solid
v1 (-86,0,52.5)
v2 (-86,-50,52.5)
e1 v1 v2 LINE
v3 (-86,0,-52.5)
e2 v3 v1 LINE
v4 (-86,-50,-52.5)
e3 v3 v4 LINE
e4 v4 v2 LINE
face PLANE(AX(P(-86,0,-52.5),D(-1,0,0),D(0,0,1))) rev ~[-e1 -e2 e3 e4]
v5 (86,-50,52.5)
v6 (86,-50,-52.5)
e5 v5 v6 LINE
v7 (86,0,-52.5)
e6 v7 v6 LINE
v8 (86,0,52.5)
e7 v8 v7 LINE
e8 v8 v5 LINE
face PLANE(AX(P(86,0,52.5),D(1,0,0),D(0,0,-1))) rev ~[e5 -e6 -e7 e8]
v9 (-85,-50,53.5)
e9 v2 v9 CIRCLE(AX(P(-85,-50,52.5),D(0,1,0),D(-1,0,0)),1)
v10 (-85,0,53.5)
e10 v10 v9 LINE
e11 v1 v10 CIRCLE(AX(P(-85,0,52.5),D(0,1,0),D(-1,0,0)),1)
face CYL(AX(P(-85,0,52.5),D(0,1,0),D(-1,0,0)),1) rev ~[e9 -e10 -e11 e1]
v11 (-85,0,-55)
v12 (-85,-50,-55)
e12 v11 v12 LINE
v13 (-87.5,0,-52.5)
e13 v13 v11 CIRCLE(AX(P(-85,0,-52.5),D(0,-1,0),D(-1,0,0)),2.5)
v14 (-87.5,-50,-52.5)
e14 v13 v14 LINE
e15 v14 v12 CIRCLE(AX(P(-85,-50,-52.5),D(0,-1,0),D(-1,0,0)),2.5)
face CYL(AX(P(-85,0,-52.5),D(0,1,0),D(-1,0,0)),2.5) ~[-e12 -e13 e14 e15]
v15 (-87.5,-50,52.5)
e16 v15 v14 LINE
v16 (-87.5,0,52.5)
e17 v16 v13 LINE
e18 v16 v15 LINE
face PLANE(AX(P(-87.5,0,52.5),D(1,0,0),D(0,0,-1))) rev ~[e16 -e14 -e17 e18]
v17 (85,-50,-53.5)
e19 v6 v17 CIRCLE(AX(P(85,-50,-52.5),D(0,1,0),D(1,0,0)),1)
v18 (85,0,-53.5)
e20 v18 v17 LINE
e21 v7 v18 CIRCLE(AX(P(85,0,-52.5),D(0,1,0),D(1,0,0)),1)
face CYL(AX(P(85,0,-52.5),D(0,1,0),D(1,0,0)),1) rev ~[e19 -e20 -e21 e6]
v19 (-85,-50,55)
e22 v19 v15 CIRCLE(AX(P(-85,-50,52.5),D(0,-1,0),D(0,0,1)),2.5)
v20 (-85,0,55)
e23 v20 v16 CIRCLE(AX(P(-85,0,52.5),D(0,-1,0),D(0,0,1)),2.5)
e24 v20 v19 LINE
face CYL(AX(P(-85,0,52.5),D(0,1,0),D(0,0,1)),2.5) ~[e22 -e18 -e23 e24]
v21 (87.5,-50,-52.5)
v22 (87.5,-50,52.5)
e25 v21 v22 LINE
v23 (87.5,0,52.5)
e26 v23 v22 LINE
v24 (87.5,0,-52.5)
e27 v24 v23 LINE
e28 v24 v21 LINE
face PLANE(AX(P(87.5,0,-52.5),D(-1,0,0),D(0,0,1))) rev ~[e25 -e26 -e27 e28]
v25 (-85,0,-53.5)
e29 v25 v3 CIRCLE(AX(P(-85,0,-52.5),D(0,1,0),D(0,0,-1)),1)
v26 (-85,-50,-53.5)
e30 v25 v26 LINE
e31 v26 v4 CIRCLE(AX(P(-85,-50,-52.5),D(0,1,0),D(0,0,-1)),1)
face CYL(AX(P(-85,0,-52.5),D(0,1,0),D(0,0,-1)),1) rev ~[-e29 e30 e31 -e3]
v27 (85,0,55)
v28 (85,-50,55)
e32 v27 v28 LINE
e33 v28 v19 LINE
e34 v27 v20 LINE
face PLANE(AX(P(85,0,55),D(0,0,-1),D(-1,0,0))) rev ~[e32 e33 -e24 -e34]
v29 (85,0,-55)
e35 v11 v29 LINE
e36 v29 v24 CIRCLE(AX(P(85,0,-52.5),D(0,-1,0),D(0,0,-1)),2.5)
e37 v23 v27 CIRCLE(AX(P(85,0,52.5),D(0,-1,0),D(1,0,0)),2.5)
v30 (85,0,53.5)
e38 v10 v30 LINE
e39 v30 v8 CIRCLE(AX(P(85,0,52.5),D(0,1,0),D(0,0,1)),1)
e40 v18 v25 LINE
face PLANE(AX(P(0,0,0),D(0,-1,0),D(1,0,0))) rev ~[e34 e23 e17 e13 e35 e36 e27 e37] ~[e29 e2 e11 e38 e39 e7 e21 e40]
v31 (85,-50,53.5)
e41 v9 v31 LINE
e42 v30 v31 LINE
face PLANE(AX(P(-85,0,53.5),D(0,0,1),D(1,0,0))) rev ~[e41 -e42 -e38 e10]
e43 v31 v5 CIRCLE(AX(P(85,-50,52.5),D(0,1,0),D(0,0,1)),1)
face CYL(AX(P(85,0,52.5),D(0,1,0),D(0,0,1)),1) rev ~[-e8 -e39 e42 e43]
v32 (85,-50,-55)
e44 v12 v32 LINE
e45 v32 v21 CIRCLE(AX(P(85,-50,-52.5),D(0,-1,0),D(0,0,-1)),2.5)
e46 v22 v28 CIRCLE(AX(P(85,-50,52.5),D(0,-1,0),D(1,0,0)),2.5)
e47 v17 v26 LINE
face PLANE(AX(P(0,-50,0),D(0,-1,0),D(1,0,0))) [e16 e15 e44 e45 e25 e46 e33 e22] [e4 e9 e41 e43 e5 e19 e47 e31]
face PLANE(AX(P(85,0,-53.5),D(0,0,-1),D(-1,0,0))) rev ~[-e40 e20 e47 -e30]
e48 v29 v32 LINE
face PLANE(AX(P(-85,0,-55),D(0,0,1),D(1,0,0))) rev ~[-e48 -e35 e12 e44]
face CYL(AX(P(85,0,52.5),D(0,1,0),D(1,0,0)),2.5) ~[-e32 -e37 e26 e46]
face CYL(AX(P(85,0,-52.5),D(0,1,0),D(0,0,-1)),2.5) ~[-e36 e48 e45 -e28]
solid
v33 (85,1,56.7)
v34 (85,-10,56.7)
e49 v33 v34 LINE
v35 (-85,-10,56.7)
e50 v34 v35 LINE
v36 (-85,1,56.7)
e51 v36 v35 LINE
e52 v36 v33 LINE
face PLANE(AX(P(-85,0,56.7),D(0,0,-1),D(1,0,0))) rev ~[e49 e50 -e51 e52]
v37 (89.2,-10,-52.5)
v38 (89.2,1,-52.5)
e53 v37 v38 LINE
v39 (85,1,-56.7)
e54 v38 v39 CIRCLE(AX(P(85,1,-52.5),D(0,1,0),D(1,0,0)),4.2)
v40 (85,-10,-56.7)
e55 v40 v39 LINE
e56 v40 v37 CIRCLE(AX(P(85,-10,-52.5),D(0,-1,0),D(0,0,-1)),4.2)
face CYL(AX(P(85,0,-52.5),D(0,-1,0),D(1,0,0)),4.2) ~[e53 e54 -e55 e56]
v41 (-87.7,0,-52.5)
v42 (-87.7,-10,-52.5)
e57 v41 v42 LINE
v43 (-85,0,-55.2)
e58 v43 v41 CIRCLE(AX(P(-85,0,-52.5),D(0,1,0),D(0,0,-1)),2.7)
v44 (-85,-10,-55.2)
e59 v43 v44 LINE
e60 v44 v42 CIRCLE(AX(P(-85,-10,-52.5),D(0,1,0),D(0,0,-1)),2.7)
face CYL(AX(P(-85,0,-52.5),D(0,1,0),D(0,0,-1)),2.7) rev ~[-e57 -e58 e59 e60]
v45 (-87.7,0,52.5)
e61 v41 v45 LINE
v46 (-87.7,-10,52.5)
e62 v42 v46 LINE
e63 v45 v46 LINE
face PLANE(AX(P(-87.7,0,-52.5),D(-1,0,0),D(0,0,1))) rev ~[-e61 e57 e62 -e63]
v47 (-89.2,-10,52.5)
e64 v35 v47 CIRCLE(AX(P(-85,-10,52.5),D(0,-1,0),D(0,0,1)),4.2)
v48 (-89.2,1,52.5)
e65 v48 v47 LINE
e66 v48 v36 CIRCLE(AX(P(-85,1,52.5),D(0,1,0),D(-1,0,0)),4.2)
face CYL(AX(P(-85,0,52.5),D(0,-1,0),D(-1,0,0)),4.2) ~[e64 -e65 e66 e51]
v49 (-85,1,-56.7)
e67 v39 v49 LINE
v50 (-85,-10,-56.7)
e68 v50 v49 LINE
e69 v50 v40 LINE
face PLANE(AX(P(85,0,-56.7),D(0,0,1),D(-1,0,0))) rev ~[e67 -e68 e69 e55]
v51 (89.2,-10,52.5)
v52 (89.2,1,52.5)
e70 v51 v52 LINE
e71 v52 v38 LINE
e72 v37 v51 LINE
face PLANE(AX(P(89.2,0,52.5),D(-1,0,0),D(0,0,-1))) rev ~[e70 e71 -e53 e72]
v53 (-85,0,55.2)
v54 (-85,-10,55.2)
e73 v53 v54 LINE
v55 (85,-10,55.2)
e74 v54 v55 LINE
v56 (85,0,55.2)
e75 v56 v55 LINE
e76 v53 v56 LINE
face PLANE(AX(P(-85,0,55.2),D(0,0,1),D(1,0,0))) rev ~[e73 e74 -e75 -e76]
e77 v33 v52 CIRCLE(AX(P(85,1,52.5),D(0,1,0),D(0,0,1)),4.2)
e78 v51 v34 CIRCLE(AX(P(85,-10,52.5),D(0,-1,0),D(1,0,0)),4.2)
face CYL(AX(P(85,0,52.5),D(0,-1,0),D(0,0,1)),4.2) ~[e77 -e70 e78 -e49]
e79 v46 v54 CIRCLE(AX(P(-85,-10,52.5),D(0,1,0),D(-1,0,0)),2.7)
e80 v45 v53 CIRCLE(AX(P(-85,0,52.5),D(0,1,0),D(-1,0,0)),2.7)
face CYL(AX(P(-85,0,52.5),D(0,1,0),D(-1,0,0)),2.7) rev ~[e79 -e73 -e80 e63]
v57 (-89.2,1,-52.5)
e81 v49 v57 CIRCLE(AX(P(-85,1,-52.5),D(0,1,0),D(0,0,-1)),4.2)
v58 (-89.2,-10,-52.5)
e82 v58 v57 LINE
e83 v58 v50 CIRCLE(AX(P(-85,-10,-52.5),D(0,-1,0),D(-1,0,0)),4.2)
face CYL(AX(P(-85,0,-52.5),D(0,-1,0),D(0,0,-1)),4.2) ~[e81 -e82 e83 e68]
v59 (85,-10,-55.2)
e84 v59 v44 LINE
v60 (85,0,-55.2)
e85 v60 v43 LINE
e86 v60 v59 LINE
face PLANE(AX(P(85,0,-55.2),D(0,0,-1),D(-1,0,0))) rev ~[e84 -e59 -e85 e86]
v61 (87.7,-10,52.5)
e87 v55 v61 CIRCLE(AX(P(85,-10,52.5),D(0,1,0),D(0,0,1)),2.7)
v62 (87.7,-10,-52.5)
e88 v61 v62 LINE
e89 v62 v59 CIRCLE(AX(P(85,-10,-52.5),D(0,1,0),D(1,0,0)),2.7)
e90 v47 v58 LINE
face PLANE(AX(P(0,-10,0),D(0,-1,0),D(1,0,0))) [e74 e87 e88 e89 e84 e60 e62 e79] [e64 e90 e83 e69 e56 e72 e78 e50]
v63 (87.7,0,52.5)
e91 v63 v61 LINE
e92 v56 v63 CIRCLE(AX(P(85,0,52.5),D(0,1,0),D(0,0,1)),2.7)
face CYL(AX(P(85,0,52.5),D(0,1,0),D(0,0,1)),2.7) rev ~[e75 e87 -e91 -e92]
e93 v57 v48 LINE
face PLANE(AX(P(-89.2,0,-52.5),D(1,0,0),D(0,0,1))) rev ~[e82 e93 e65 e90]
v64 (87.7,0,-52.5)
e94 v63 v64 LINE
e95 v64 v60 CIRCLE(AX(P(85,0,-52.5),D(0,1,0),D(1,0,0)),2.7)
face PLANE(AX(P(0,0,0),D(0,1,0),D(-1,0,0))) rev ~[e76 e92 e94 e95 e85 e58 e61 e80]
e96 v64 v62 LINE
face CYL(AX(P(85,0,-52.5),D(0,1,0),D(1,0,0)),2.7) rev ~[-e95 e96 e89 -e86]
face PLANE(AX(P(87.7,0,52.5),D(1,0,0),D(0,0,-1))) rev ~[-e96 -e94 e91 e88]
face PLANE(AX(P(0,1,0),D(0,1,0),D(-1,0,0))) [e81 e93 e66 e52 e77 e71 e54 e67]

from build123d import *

# Parameters (mm, degrees)
F3_DEPTH = 50
F5_DEPTH = 10
F7_DEPTH = 1


with BuildPart() as f3:
    # F2 (on Front) → F3 (new body)
    with BuildSketch(Plane.XZ):
        with BuildLine():
            Line((87.5, -52.5), (87.5, 52.5))
            ThreePointArc((87.5, 52.5), (86.767766953, 54.267766953), (85, 55))
            Line((85, 55), (-85, 55))
            ThreePointArc((-85, 55), (-86.767766953, 54.267766953), (-87.5, 52.5))
            Line((-87.5, 52.5), (-87.5, -52.5))
            ThreePointArc((-87.5, -52.5), (-86.767766953, -54.267766953), (-85, -55))
            Line((-85, -55), (85, -55))
            ThreePointArc((85, -55), (86.767766953, -54.267766953), (87.5, -52.5))
        make_face()
        with BuildLine():
            ThreePointArc((-86, 52.5), (-85.7071067812, 53.2071067812), (-85, 53.5))
            Line((-85, 53.5), (85, 53.5))
            ThreePointArc((85, 53.5), (85.7071067812, 53.2071067812), (86, 52.5))
            Line((86, 52.5), (86, -52.5))
            ThreePointArc((86, -52.5), (85.7071067812, -53.2071067812), (85, -53.5))
            Line((85, -53.5), (-85, -53.5))
            ThreePointArc((-85, -53.5), (-85.7071067812, -53.2071067812), (-86, -52.5))
            Line((-86, -52.5), (-86, 52.5))
        make_face(mode=Mode.SUBTRACT)
    extrude(amount=F3_DEPTH)


with BuildPart() as f5:
    # F4 (on Front) → F5 (new body)
    with BuildSketch(Plane.XZ):
        with BuildLine():
            ThreePointArc((-89.2, -52.5), (-87.969848481, -55.469848481), (-85, -56.7))
            Line((-85, -56.7), (85, -56.7))
            ThreePointArc((85, -56.7), (87.969848481, -55.469848481), (89.2, -52.5))
            Line((89.2, -52.5), (89.2, 52.5))
            ThreePointArc((89.2, 52.5), (87.969848481, 55.469848481), (85, 56.7))
            Line((85, 56.7), (-85, 56.7))
            ThreePointArc((-85, 56.7), (-87.969848481, 55.469848481), (-89.2, 52.5))
            Line((-89.2, 52.5), (-89.2, -52.5))
        make_face()
        with BuildLine():
            Line((85, -55.2), (-85, -55.2))
            ThreePointArc((-85, -55.2), (-86.9091883092, -54.4091883092), (-87.7, -52.5))
            Line((-87.7, -52.5), (-87.7, 52.5))
            ThreePointArc((-87.7, 52.5), (-86.9091883092, 54.4091883092), (-85, 55.2))
            Line((-85, 55.2), (85, 55.2))
            ThreePointArc((85, 55.2), (86.9091883092, 54.4091883092), (87.7, 52.5))
            Line((87.7, 52.5), (87.7, -52.5))
            ThreePointArc((87.7, -52.5), (86.9091883092, -54.4091883092), (85, -55.2))
        make_face(mode=Mode.SUBTRACT)
    extrude(amount=F5_DEPTH)

    # F6 (on face) → F7 (join)
    with BuildSketch(Plane(origin=(0, 0, 0), x_dir=(-1, 0, 0), z_dir=(0, 1, 0))):
        with BuildLine():
            ThreePointArc((-85, 56.7), (-87.969848481, 55.469848481), (-89.2, 52.5))
            Line((-89.2, 52.5), (-89.2, -52.5))
            ThreePointArc((-89.2, -52.5), (-87.969848481, -55.469848481), (-85, -56.7))
            Line((-85, -56.7), (85, -56.7))
            ThreePointArc((85, -56.7), (87.969848481, -55.469848481), (89.2, -52.5))
            Line((89.2, -52.5), (89.2, 52.5))
            ThreePointArc((89.2, 52.5), (87.969848481, 55.469848481), (85, 56.7))
            Line((85, 56.7), (-85, 56.7))
        make_face()
    extrude(amount=F7_DEPTH)


solid = Compound([f3.part, f5.part])
